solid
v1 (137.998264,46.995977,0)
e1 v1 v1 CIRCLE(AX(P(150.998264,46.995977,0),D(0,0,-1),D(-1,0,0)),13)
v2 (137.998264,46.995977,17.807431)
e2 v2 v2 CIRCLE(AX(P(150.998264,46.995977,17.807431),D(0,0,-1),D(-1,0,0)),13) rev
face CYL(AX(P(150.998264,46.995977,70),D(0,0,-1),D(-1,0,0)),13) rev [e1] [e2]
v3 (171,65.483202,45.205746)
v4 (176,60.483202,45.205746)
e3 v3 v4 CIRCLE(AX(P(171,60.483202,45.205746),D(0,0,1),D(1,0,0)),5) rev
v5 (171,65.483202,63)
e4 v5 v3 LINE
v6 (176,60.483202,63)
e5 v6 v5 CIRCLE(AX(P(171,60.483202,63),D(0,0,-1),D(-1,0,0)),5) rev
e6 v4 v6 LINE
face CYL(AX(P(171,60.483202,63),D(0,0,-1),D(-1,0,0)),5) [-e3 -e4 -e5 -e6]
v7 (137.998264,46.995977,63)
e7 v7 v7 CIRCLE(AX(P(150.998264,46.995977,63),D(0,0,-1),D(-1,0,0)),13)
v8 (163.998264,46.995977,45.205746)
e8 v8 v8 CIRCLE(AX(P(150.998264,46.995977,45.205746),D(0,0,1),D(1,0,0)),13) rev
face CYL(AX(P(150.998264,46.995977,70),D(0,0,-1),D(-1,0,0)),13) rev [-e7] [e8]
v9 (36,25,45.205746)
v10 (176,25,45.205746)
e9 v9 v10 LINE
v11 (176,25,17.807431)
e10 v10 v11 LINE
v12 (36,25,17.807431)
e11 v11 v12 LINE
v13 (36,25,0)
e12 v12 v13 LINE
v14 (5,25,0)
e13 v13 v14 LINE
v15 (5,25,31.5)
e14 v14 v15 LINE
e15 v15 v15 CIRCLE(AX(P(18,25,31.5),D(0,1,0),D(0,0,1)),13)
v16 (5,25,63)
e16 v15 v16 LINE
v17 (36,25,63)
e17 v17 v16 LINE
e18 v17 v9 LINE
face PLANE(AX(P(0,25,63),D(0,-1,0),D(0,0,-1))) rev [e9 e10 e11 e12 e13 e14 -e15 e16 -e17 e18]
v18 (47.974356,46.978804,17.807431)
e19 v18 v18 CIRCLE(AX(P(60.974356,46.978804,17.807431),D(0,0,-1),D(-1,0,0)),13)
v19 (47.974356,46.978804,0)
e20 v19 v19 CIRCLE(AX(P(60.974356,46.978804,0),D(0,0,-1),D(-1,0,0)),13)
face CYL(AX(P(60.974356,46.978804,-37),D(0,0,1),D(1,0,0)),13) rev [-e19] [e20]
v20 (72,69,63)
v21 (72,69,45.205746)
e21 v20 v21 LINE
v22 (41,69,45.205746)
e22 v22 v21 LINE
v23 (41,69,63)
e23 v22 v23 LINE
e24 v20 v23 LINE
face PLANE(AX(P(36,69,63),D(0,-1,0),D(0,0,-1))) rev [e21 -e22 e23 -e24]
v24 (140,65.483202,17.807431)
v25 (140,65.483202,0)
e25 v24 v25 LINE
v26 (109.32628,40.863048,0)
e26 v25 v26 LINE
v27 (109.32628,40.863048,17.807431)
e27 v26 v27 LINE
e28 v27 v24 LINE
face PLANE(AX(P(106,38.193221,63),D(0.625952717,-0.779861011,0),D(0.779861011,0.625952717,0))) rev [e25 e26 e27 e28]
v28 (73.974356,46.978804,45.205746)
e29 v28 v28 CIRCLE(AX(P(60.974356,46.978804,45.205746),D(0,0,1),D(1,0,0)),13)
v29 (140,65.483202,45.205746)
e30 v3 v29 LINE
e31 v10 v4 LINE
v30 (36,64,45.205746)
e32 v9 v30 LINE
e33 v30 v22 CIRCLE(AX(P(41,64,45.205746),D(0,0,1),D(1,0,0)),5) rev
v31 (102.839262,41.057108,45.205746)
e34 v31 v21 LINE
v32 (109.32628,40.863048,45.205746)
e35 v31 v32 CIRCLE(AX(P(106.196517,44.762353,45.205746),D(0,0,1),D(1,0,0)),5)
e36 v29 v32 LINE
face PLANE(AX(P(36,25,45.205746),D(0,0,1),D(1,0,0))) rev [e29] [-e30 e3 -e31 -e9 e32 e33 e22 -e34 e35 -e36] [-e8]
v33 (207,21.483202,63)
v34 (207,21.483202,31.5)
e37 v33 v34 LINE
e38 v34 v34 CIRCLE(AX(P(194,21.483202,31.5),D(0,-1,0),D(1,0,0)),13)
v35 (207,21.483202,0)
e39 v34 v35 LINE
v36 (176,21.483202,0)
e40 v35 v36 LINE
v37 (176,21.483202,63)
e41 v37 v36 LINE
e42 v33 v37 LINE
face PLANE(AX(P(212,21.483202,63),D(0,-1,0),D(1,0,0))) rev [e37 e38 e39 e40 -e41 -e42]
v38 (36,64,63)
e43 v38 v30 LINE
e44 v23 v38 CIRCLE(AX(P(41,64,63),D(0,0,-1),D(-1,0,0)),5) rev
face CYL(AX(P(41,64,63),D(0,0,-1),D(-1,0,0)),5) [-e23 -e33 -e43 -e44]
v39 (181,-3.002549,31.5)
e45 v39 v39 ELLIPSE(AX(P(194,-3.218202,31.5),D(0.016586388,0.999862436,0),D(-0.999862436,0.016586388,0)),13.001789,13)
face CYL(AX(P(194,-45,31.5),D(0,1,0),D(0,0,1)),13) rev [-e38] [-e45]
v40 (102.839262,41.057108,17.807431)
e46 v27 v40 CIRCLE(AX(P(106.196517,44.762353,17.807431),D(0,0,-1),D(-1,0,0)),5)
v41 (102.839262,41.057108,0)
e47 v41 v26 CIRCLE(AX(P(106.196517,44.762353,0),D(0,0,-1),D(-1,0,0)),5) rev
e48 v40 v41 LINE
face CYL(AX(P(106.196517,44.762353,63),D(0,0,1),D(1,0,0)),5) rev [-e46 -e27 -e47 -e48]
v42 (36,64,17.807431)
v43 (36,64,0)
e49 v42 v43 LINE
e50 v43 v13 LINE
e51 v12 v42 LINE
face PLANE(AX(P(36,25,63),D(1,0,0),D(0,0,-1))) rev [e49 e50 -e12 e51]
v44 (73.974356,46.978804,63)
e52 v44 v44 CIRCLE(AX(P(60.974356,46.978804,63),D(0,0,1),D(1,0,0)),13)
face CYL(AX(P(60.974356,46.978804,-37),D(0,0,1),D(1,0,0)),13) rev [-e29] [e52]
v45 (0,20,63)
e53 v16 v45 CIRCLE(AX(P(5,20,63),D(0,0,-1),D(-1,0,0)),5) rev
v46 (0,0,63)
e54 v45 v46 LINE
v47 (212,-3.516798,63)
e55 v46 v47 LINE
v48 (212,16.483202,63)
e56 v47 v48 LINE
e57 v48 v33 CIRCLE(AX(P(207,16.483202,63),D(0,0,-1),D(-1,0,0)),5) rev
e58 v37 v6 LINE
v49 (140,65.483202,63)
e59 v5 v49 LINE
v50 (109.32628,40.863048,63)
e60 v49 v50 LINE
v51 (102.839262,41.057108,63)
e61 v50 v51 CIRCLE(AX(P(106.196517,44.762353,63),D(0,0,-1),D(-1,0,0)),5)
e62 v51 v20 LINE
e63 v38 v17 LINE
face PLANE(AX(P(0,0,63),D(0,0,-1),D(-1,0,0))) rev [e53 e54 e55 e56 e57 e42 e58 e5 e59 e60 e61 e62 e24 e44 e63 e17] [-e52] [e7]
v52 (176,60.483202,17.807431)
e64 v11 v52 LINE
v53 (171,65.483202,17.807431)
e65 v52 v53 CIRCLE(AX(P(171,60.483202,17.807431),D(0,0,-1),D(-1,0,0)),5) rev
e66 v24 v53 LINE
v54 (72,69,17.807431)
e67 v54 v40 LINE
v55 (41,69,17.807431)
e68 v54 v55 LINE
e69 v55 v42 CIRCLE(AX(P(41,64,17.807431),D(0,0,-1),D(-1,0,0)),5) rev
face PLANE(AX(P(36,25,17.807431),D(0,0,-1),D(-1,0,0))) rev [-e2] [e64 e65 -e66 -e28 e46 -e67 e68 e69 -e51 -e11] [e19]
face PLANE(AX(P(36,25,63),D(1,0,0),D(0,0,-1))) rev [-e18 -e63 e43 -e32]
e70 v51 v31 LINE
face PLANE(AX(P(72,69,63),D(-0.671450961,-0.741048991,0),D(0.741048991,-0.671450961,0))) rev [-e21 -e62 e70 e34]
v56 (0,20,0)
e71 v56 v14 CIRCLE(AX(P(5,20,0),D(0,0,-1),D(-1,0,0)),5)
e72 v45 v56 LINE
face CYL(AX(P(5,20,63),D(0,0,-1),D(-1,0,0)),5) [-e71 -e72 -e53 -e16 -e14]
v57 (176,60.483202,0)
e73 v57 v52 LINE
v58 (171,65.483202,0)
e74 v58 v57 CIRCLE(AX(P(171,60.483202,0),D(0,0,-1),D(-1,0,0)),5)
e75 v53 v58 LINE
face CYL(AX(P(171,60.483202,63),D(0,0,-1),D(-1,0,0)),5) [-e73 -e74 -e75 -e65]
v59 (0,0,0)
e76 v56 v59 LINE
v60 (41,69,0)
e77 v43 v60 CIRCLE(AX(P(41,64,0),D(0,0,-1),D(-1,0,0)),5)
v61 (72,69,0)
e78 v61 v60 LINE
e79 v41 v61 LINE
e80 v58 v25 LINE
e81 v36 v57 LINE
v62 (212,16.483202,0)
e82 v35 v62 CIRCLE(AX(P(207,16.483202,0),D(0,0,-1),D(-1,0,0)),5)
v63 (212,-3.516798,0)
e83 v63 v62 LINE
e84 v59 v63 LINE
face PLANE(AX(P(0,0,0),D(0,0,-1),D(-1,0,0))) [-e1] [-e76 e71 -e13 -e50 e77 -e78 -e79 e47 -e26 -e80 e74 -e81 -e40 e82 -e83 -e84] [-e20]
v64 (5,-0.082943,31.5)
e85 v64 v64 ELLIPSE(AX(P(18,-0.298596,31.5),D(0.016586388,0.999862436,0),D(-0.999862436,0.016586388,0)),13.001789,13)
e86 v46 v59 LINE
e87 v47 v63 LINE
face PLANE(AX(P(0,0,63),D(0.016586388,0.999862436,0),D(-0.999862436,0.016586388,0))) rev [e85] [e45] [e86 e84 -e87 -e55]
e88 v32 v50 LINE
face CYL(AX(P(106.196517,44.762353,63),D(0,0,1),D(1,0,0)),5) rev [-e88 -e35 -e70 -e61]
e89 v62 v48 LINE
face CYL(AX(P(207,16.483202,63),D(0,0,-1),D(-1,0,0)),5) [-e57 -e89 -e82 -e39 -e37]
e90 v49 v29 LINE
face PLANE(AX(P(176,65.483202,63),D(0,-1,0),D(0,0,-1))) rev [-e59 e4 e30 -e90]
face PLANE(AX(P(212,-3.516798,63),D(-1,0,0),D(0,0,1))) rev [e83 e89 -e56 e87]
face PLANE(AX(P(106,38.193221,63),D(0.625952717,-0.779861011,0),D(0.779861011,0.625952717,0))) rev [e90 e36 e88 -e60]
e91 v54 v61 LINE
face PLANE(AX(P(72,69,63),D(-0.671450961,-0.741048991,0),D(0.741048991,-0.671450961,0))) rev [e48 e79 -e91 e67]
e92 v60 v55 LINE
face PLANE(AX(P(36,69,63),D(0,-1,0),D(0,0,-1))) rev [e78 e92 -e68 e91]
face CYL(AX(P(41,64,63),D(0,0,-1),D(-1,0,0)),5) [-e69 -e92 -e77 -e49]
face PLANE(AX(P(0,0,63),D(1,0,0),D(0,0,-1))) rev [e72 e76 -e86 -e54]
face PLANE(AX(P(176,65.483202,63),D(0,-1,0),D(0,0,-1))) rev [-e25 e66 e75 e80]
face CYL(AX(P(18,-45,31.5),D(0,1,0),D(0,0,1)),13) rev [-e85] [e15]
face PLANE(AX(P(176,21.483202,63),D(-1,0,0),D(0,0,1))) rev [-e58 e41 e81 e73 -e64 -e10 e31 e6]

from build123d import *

# Parameters (mm, degrees)
BOSS_EXTRUDE1_DEPTH = 63
SKETCH10_R          = 13
CUT_EXTRUDE3_DEPTH  = 70
SKETCH12_R          = 13
CUT_EXTRUDE4_DEPTH  = 70
SKETCH16_W          = 140
SKETCH16_H          = 27.398314348
CUT_EXTRUDE6_DEPTH  = 44
SKETCH17_R          = 13
CUT_EXTRUDE7_DEPTH  = 100
FILLET1_R           = 5
FILLET2_R           = 5
FILLET3_R           = 5
FILLET4_R           = 5
FILLET5_R           = 5
FILLET6_R           = 5
FILLET7_R           = 5
FILLET8_R           = 5


with BuildPart() as part:
    # Sketch2 → Boss-Extrude1 (new body)
    with BuildSketch(Plane.XY):
        Polygon((0, 0), (212, -3.51679799), (212, 21.48320201), (176, 21.48320201), (176, 65.48320201), (140, 65.48320201), (106, 38.193220771), (72, 69), (36, 69), (36, 25), (0, 25), align=None)
    extrude(amount=BOSS_EXTRUDE1_DEPTH)

    # Sketch10 → Cut-Extrude3 (cut)
    with BuildSketch(Plane(origin=(0, 0, 0), x_dir=(-1, 0, 0), z_dir=(0, 0, -1))):
        with Locations((-150.998263924, 46.995976699)):
            Circle(SKETCH10_R)
    extrude(amount=-CUT_EXTRUDE3_DEPTH, mode=Mode.SUBTRACT)

    # Sketch12 → Cut-Extrude4 (cut)
    with BuildSketch(Plane(origin=(0, 25, 0), x_dir=(1, 0, 0), z_dir=(0, 1, 0))):
        with Locations(Location((18, -31.5, 0), (0, 0, 270))):
            Circle(SKETCH12_R)
        with Locations((194, -31.5)):
            Circle(SKETCH12_R)
    extrude(amount=-CUT_EXTRUDE4_DEPTH, mode=Mode.SUBTRACT)

    # Sketch16 → Cut-Extrude6 (cut)
    with BuildSketch(Plane(origin=(0, 69, 0), x_dir=(1, 0, 0), z_dir=(0, 1, 0))):
        with Locations((106, -31.506588427)):
            Rectangle(SKETCH16_W, SKETCH16_H)
    extrude(amount=-CUT_EXTRUDE6_DEPTH, mode=Mode.SUBTRACT)

    # Sketch17 → Cut-Extrude7 (cut)
    with BuildSketch(Plane.XY.offset(63)):
        with Locations((60.97435617, 46.978804013)):
            Circle(SKETCH17_R)
    extrude(amount=-CUT_EXTRUDE7_DEPTH, mode=Mode.SUBTRACT)

    # Fillet1
    fillet1_edges = [part.edges().sort_by_distance(p)[0] for p in [
        (106, 38.193220771, 8.903715627),
    ]]
    fillet(fillet1_edges, radius=FILLET1_R)

    # Fillet2
    fillet2_edges = [part.edges().sort_by_distance(p)[0] for p in [
        (106, 38.193220771, 54.102872801),
    ]]
    fillet(fillet2_edges, radius=FILLET2_R)

    # Fillet3
    fillet3_edges = [part.edges().sort_by_distance(p)[0] for p in [
        (212, 21.48320201, 31.5),
    ]]
    fillet(fillet3_edges, radius=FILLET3_R - 0.0001)  # a hair under: the kernel refuses the full size

    # Fillet4
    fillet4_edges = [part.edges().sort_by_distance(p)[0] for p in [
        (176, 65.48320201, 54.102872801),
    ]]
    fillet(fillet4_edges, radius=FILLET4_R)

    # Fillet5
    fillet5_edges = [part.edges().sort_by_distance(p)[0] for p in [
        (176, 65.48320201, 8.903715627),
    ]]
    fillet(fillet5_edges, radius=FILLET5_R)

    # Fillet6
    fillet6_edges = [part.edges().sort_by_distance(p)[0] for p in [
        (36, 69, 54.102872801),
    ]]
    fillet(fillet6_edges, radius=FILLET6_R)

    # Fillet7
    fillet7_edges = [part.edges().sort_by_distance(p)[0] for p in [
        (36, 69, 8.903715627),
    ]]
    fillet(fillet7_edges, radius=FILLET7_R)

    # Fillet8
    fillet8_edges = [part.edges().sort_by_distance(p)[0] for p in [
        (0, 25, 31.5),
    ]]
    fillet(fillet8_edges, radius=FILLET8_R - 0.0001)  # a hair under: the kernel refuses the full size


solid = part.part
